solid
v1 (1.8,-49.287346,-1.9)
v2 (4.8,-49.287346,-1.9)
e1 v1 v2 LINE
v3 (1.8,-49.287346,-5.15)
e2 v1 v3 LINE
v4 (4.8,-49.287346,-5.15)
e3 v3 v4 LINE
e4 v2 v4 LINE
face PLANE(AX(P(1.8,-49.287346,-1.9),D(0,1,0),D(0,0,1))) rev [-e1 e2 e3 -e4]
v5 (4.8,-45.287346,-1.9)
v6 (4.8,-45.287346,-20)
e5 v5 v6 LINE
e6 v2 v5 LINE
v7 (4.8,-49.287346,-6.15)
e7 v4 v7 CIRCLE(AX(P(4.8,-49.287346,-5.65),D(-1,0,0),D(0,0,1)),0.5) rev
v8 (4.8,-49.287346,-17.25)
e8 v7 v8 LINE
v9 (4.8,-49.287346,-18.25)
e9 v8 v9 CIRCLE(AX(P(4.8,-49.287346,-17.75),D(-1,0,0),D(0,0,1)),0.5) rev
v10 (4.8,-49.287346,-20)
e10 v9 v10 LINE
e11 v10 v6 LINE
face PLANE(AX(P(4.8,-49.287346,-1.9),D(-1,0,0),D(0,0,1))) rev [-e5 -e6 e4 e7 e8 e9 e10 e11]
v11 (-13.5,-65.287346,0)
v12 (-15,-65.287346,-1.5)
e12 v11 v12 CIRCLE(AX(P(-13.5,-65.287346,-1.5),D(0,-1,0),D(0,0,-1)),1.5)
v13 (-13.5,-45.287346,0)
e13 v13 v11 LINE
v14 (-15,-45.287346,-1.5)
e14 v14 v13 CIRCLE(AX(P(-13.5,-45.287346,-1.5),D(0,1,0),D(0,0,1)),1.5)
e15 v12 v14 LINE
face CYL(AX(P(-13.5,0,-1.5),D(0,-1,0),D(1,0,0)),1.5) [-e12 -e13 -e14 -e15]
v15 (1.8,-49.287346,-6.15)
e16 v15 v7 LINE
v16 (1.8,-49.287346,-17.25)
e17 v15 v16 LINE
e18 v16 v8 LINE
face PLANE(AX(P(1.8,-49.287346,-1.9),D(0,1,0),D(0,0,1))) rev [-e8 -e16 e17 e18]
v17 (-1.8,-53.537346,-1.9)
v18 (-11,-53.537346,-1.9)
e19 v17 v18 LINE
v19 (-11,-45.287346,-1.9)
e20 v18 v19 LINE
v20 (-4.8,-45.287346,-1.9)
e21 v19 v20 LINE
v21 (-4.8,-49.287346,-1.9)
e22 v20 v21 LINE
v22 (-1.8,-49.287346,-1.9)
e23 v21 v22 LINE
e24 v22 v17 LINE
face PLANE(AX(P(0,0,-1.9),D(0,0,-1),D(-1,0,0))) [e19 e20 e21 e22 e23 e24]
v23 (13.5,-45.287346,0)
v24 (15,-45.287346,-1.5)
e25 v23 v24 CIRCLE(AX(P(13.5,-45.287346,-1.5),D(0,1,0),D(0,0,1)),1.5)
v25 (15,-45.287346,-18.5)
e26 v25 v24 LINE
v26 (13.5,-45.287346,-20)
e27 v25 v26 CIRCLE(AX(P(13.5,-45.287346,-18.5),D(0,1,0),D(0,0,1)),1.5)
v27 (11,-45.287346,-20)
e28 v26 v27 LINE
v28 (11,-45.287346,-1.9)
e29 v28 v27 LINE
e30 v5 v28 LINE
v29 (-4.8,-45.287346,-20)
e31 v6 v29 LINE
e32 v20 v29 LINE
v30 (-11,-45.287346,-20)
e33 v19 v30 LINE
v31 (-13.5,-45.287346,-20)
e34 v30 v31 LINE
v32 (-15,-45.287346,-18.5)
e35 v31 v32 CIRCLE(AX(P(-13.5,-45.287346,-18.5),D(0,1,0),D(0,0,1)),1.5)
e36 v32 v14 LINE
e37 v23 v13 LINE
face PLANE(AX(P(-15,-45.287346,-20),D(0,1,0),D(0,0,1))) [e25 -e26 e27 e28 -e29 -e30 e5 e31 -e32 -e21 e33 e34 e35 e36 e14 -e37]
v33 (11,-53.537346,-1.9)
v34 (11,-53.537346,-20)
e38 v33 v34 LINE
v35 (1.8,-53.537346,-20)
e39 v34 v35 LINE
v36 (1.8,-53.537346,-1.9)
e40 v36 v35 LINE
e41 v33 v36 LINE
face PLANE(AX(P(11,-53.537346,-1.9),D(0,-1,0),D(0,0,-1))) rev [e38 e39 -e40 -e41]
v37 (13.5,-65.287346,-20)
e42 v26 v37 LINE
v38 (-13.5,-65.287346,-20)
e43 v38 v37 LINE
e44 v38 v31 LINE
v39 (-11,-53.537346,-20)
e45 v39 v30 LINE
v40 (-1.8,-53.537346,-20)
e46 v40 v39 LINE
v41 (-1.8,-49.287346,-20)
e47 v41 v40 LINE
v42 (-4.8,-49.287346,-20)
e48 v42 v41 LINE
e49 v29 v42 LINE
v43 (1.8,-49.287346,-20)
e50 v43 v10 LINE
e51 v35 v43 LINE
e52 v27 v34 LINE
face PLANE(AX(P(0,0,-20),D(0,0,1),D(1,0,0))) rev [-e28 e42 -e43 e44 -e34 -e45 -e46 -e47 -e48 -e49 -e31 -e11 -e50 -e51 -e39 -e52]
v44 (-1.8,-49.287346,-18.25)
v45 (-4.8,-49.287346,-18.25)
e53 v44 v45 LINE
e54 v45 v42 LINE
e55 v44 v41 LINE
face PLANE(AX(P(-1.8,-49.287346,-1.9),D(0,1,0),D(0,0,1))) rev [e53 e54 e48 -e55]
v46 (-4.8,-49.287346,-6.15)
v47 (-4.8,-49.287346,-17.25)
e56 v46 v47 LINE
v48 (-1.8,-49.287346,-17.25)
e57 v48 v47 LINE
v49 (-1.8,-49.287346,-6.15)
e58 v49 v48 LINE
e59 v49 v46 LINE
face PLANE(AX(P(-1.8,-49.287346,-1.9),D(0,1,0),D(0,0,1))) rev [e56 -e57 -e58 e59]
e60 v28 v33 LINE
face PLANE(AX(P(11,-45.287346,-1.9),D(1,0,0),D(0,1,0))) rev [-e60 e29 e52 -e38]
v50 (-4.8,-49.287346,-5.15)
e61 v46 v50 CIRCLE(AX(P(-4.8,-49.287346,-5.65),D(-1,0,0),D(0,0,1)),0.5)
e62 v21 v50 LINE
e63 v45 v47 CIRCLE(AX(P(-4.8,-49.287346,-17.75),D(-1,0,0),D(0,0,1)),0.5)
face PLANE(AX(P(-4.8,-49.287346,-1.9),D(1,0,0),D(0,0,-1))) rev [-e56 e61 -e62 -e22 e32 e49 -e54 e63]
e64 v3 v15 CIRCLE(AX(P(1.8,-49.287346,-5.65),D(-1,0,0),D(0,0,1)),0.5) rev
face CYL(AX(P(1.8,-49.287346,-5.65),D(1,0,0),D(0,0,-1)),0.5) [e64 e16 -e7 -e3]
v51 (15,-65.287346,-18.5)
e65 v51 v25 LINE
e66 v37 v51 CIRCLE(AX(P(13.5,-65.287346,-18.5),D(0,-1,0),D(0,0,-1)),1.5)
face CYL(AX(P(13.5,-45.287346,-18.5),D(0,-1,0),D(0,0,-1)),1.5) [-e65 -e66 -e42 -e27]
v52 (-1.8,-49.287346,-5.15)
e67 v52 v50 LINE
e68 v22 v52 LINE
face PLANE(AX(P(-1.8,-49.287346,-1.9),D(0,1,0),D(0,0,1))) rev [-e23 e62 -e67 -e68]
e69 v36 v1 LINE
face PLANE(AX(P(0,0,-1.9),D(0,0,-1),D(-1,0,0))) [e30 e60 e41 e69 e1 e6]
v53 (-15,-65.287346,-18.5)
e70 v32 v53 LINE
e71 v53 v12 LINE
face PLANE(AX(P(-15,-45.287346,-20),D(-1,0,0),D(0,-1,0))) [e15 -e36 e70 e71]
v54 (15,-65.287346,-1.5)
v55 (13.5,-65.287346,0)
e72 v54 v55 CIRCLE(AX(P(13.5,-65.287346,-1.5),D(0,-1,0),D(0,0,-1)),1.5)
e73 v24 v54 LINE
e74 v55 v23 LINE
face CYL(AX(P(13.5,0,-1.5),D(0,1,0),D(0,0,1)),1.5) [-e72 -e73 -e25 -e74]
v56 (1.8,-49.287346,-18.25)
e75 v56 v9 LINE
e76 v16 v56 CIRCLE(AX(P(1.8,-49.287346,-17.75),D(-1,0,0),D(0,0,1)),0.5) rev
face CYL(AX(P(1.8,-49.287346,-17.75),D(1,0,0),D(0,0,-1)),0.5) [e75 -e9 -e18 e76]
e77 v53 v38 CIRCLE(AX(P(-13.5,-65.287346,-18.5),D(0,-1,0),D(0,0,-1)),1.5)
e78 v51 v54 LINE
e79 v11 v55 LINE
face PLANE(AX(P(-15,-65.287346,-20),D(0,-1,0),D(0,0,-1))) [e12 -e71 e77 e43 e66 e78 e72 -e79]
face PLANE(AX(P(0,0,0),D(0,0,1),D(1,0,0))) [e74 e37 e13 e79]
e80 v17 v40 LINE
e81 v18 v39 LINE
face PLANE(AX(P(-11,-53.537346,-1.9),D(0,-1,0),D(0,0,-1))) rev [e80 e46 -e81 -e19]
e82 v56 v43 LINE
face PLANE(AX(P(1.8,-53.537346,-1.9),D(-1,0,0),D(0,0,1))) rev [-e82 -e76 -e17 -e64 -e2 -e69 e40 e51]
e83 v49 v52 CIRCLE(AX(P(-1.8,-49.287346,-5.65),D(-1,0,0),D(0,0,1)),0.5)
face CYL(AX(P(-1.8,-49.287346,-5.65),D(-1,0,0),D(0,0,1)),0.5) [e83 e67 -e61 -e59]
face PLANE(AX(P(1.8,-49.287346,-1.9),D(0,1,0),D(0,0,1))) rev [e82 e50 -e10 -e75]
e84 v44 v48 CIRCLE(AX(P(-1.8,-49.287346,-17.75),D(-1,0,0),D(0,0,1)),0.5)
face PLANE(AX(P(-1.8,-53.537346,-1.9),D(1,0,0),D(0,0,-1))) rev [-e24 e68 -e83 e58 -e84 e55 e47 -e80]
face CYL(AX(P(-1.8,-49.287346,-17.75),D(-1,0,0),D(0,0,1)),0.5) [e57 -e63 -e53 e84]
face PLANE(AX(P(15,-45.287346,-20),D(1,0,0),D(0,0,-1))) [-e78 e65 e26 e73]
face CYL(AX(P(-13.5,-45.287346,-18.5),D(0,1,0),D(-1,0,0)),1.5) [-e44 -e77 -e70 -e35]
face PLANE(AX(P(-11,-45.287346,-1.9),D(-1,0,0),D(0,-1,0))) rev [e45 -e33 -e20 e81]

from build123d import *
from OCP.BRepFilletAPI import BRepFilletAPI_MakeChamfer

# Parameters (mm, degrees)
BOSS_EXTRUDE1_DEPTH           = 10
BOSS_EXTRUDE1_DEPTH_BACK      = 20
SKETCH12_R                    = 15
CUT_EXTRUDE9_DEPTH            = 8
CHAMFER1_SIZE                 = 1.5
CHAMFER1_SIZE2                = 0.46241
FILLET11_R                    = 0.78
CHAMFER2_SIZE2                = 5
CHAMFER2_SIZE                 = 8
CUT_EXTRUDE10_START           = -3
SKETCH18_W                    = 25.5
SKETCH18_H                    = 24.1
CUT_EXTRUDE10_DEPTH           = 4.1
SKETCH19_W                    = 8.6
SKETCH19_H                    = 8.6
CUT_EXTRUDE13_DEPTH           = 3.7
CUT_EXTRUDE14_DEPTH           = 2
SKETCH21_R                    = 3.8
CUT_EXTRUDE15_DEPTH           = 116.348128402
SKETCH10_R                    = 12.5
CUT_EXTRUDE8_DEPTH            = 3
SKETCH22_R                    = 0.95
BOSS_EXTRUDE5_DEPTH           = 1.1
BOSS_EXTRUDE5_DRAFT           = 30
BOSS_EXTRUDE5_PROFILE_2_DEPTH = 1.1
BOSS_EXTRUDE5_PROFILE_2_DRAFT = 30
BOSS_EXTRUDE5_PROFILE_3_DEPTH = 1.1
BOSS_EXTRUDE5_PROFILE_3_DRAFT = 30
BOSS_EXTRUDE5_PROFILE_4_DEPTH = 1.1
BOSS_EXTRUDE5_PROFILE_4_DRAFT = 30
CUT_EXTRUDE16_DEPTH           = 8.5
FILLET13_R                    = 2
BOSS_EXTRUDE6_DEPTH           = 3
LPATTERN1_COUNT               = 2
LPATTERN1_PITCH               = 150
LPATTERN1_COPY_1_SKETCH_R     = 0.95
LPATTERN1_COPY_1_DEPTH        = 1.1
LPATTERN1_COPY_1_DRAFT        = 30
LPATTERN1_COPY_2_SKETCH_R     = 0.95
LPATTERN1_COPY_2_DEPTH        = 1.1
LPATTERN1_COPY_2_DRAFT        = 30
LPATTERN1_COPY_3_SKETCH_R     = 0.95
LPATTERN1_COPY_3_DEPTH        = 1.1
LPATTERN1_COPY_3_DRAFT        = 30
LPATTERN1_COPY_4_SKETCH_R     = 0.95
LPATTERN1_COPY_4_DEPTH        = 1.1
LPATTERN1_COPY_4_DRAFT        = 30
LPATTERN1_COPY_5_SKETCH_R     = 0.95
LPATTERN1_COPY_5_DEPTH        = 1.1
LPATTERN1_COPY_5_DRAFT        = 30
LPATTERN1_COPY_6_SKETCH_R     = 0.95
LPATTERN1_COPY_6_DEPTH        = 1.1
LPATTERN1_COPY_6_DRAFT        = 30
LPATTERN1_COPY_7_SKETCH_R     = 0.95
LPATTERN1_COPY_7_DEPTH        = 1.1
LPATTERN1_COPY_7_DRAFT        = 30
FILLET13_OF_LPATTERN1_R       = 2
FILLET12_R                    = 100
FILLET14_R                    = 1
SKETCH32_R                    = 4.55
SKETCH32_R_2                  = 4.5
CUT_EXTRUDE17_DEPTH           = 3
SKETCH33_R                    = 2.75
CUT_EXTRUDE18_DEPTH           = 114.802213105
CUT_EXTRUDE19_DEPTH           = 5
SKETCH56_W                    = 30
SKETCH56_H                    = 20
BOSS_EXTRUDE10_DEPTH          = 20
CUT_EXTRUDE21_DEPTH           = 18.1
FILLET15_R                    = 1.5


# Read off the part's stored shape, not the designer's step: Split3
# Some blends are built 0.0001 mm under size
with BuildPart() as part:
    # Sketch1 → Boss-Extrude1 (new, two sides: drawn at the far end of the back side and taken through both)
    with BuildSketch(Plane.XY.offset(-BOSS_EXTRUDE1_DEPTH_BACK)):
        with BuildLine():
            Line((-100, -15), (0, -51.866662613))
            Line((0, -51.866662613), (100, -15))
            Line((100, -15), (100, 15))
            Line((100, 15), (60, 15))
            add(Edge.make_bspline(
                [(-60, 15), (-39.699350007, 14.814430853), (0, 45.185569147), (39.699350007, 14.814430853), (60, 15)],
                knots=[0, 0, 0, 0, 0.5, 1, 1, 1, 1], degree=3))
            Line((-60, 15), (-100, 15))
            Line((-100, 15), (-100, -15))
        make_face()
        with BuildLine():
            Line((3.188323159, 2.335673435), (2.875864874, 2.765735369))
            Line((2.875864874, 2.765735369), (4.089390366, 3.647413248))
            Line((4.089390366, 3.647413248), (4.40184865, 3.217351313))
            ThreePointArc((4.40184865, 3.217351313), (5.258610463, 4.17939586), (5.908815238, 5.29151288))
            Line((5.908815238, 5.29151288), (5.403247113, 5.455781921))
            Line((5.403247113, 5.455781921), (5.866772605, 6.882366696))
            Line((5.866772605, 6.882366696), (6.37234073, 6.718097654))
            ThreePointArc((6.37234073, 6.718097654), (6.5, 8), (6.37234073, 9.281902346))
            Line((6.37234073, 9.281902346), (5.866772605, 9.117633304))
            Line((5.866772605, 9.117633304), (5.403247113, 10.544218079))
            Line((5.403247113, 10.544218079), (5.908815238, 10.70848712))
            ThreePointArc((5.908815238, 10.70848712), (5.258610463, 11.82060414), (4.40184865, 12.782648687))
            Line((4.40184865, 12.782648687), (4.089390366, 12.352586752))
            Line((4.089390366, 12.352586752), (2.875864874, 13.234264631))
            Line((2.875864874, 13.234264631), (3.188323159, 13.664326565))
            ThreePointArc((3.188323159, 13.664326565), (2.008610463, 14.181867356), (0.75, 14.456585785))
            Line((0.75, 14.456585785), (0.75, 13.925))
            Line((0.75, 13.925), (-0.75, 13.925))
            Line((-0.75, 13.925), (-0.75, 14.456585785))
            ThreePointArc((-0.75, 14.456585785), (-2.008610463, 14.181867356), (-3.188323159, 13.664326565))
            Line((-3.188323159, 13.664326565), (-2.875864874, 13.234264631))
            Line((-2.875864874, 13.234264631), (-4.089390366, 12.352586752))
            Line((-4.089390366, 12.352586752), (-4.40184865, 12.782648687))
            ThreePointArc((-4.40184865, 12.782648687), (-5.258610463, 11.82060414), (-5.908815238, 10.70848712))
            Line((-5.908815238, 10.70848712), (-5.403247113, 10.544218079))
            Line((-5.403247113, 10.544218079), (-5.866772605, 9.117633304))
            Line((-5.866772605, 9.117633304), (-6.37234073, 9.281902346))
            ThreePointArc((-6.37234073, 9.281902346), (-6.5, 8), (-6.37234073, 6.718097654))
            Line((-6.37234073, 6.718097654), (-5.866772605, 6.882366696))
            Line((-5.866772605, 6.882366696), (-5.403247113, 5.455781921))
            Line((-5.403247113, 5.455781921), (-5.908815238, 5.29151288))
            ThreePointArc((-5.908815238, 5.29151288), (-5.258610463, 4.17939586), (-4.40184865, 3.217351313))
            Line((-4.40184865, 3.217351313), (-4.089390366, 3.647413248))
            Line((-4.089390366, 3.647413248), (-2.875864874, 2.765735369))
            Line((-2.875864874, 2.765735369), (-3.188323159, 2.335673435))
            ThreePointArc((-3.188323159, 2.335673435), (-2.008610463, 1.818132644), (-0.75, 1.543414215))
            Line((-0.75, 1.543414215), (-0.75, 2.075))
            Line((-0.75, 2.075), (0.75, 2.075))
            Line((0.75, 2.075), (0.75, 1.543414215))
            ThreePointArc((0.75, 1.543414215), (2.008610463, 1.818132644), (3.188323159, 2.335673435))
        make_face(mode=Mode.SUBTRACT)
    extrude(amount=BOSS_EXTRUDE1_DEPTH + BOSS_EXTRUDE1_DEPTH_BACK)

    # Sketch12 → Cut-Extrude9 (cut)
    with BuildSketch(Plane(origin=(0, 0, -20), x_dir=(-1, 0, 0), z_dir=(0, 0, -1))):
        with Locations((0, 8)):
            Circle(SKETCH12_R)
    extrude(amount=-CUT_EXTRUDE9_DEPTH, mode=Mode.SUBTRACT)

    # Chamfer1: one chamfer whose edges measure the first distance from different faces: ONE call of the kernel's chamfer builder (chamfer() names one face for all edges)
    chamfer1_edges_1 = [part.edges().sort_by_distance(p)[0] for p in [
        (0, 2.075, -12),
    ]]
    chamfer1_side_1 = [part.faces().sort_by_distance(p)[0] for p in [
        (0, 2.075, -1),
    ]]
    chamfer1_edges_2 = [part.edges().sort_by_distance(p)[0] for p in [
        (3.48262762, 3.206574308, -12),
    ]]
    chamfer1_side_2 = [part.faces().sort_by_distance(p)[0] for p in [
        (3.48262762, 3.206574308, -1),
    ]]
    chamfer1_edges_3 = [part.edges().sort_by_distance(p)[0] for p in [
        (5.635009859, 6.169074308, -12),
    ]]
    chamfer1_side_3 = [part.faces().sort_by_distance(p)[0] for p in [
        (5.635009859, 6.169074308, -1),
    ]]
    chamfer1_edges_4 = [part.edges().sort_by_distance(p)[0] for p in [
        (5.635009859, 9.830925692, -12),
    ]]
    chamfer1_side_4 = [part.faces().sort_by_distance(p)[0] for p in [
        (5.635009859, 9.830925692, -1),
    ]]
    chamfer1_edges_5 = [part.edges().sort_by_distance(p)[0] for p in [
        (3.48262762, 12.793425692, -12),
    ]]
    chamfer1_side_5 = [part.faces().sort_by_distance(p)[0] for p in [
        (3.48262762, 12.793425692, -1),
    ]]
    chamfer1_edges_6 = [part.edges().sort_by_distance(p)[0] for p in [
        (0, 13.925, -12),
    ]]
    chamfer1_side_6 = [part.faces().sort_by_distance(p)[0] for p in [
        (0, 13.925, -1),
    ]]
    chamfer1_edges_7 = [part.edges().sort_by_distance(p)[0] for p in [
        (-3.48262762, 12.793425692, -12),
    ]]
    chamfer1_side_7 = [part.faces().sort_by_distance(p)[0] for p in [
        (-3.48262762, 12.793425692, -1),
    ]]
    chamfer1_edges_8 = [part.edges().sort_by_distance(p)[0] for p in [
        (-5.635009859, 9.830925692, -12),
    ]]
    chamfer1_side_8 = [part.faces().sort_by_distance(p)[0] for p in [
        (-5.635009859, 9.830925692, -1),
    ]]
    chamfer1_edges_9 = [part.edges().sort_by_distance(p)[0] for p in [
        (-5.635009859, 6.169074308, -12),
    ]]
    chamfer1_side_9 = [part.faces().sort_by_distance(p)[0] for p in [
        (-5.635009859, 6.169074308, -1),
    ]]
    chamfer1_edges_10 = [part.edges().sort_by_distance(p)[0] for p in [
        (-3.48262762, 3.206574308, -12),
    ]]
    chamfer1_side_10 = [part.faces().sort_by_distance(p)[0] for p in [
        (-3.48262762, 3.206574308, -1),
    ]]
    chamfer1 = BRepFilletAPI_MakeChamfer(part.part.solid().wrapped)
    for e in chamfer1_edges_1:
        chamfer1.Add(CHAMFER1_SIZE, CHAMFER1_SIZE2, e.wrapped, chamfer1_side_1[0].wrapped)  # the first distance lies on this face
    for e in chamfer1_edges_2:
        chamfer1.Add(CHAMFER1_SIZE, CHAMFER1_SIZE2, e.wrapped, chamfer1_side_2[0].wrapped)  # the first distance lies on this face
    for e in chamfer1_edges_3:
        chamfer1.Add(CHAMFER1_SIZE, CHAMFER1_SIZE2, e.wrapped, chamfer1_side_3[0].wrapped)  # the first distance lies on this face
    for e in chamfer1_edges_4:
        chamfer1.Add(CHAMFER1_SIZE, CHAMFER1_SIZE2, e.wrapped, chamfer1_side_4[0].wrapped)  # the first distance lies on this face
    for e in chamfer1_edges_5:
        chamfer1.Add(CHAMFER1_SIZE, CHAMFER1_SIZE2, e.wrapped, chamfer1_side_5[0].wrapped)  # the first distance lies on this face
    for e in chamfer1_edges_6:
        chamfer1.Add(CHAMFER1_SIZE, CHAMFER1_SIZE2, e.wrapped, chamfer1_side_6[0].wrapped)  # the first distance lies on this face
    for e in chamfer1_edges_7:
        chamfer1.Add(CHAMFER1_SIZE, CHAMFER1_SIZE2, e.wrapped, chamfer1_side_7[0].wrapped)  # the first distance lies on this face
    for e in chamfer1_edges_8:
        chamfer1.Add(CHAMFER1_SIZE, CHAMFER1_SIZE2, e.wrapped, chamfer1_side_8[0].wrapped)  # the first distance lies on this face
    for e in chamfer1_edges_9:
        chamfer1.Add(CHAMFER1_SIZE, CHAMFER1_SIZE2, e.wrapped, chamfer1_side_9[0].wrapped)  # the first distance lies on this face
    for e in chamfer1_edges_10:
        chamfer1.Add(CHAMFER1_SIZE, CHAMFER1_SIZE2, e.wrapped, chamfer1_side_10[0].wrapped)  # the first distance lies on this face
    add(Compound.cast(chamfer1.Shape()), mode=Mode.REPLACE)

    # Fillet11
    # the kernel refuses this fillet: 0.78 mm, written as the material it takes off along each edge
    with BuildSketch(Plane(origin=(-4.089390366, 12.352586752, -12.348462837), x_dir=(-0.5877852522924715, 0.8090169943749486, 0), z_dir=(0, 0, 1)), Plane(origin=(-5.866772605, 9.117633304, -12.348462837), x_dir=(-0.9510565162951549, 0.3090169943749433, 0), z_dir=(0, 0, 1)), Plane(origin=(-0.75, 13.925, -12.348462837), x_dir=(0, 1, 0), z_dir=(0, 0, 1)), Plane(origin=(2.875864874, 13.234264631, -12.348462837), x_dir=(0.5877852522924727, 0.8090169943749479, 0), z_dir=(0, 0, 1)), Plane(origin=(5.403247113, 10.544218079, -12.348462837), x_dir=(0.9510565162951538, 0.30901699437494734, 0), z_dir=(0, 0, 1)), Plane(origin=(5.866772605, 6.882366696, -12.348462837), x_dir=(0.9510565162951544, -0.30901699437494534, 0), z_dir=(0, 0, 1)), Plane(origin=(-5.403247113, 5.455781921, -12.348462837), x_dir=(-0.9510565162951544, -0.30901699437494484, 0), z_dir=(0, 0, 1)), Plane(origin=(-2.875864874, 2.765735369, -12.348462837), x_dir=(-0.5877852522924728, -0.8090169943749477, 0), z_dir=(0, 0, 1)), Plane(origin=(0.75, 2.075, -12.348462837), x_dir=(0, -1, 0), z_dir=(0, 0, 1)), Plane(origin=(4.089390366, 3.647413248, -12.348462837), x_dir=(0.5877852522924725, -0.8090169943749479, 0), z_dir=(0, 0, 1))) as fillet11_piece_1:
        with BuildLine():
            CenterArc((0.78, -0.739385135), FILLET11_R, 108.571012268, 71.428987732)
            Line((0, -0.739385135), (-0.0156, -0.739385135))
            Line((-0.0156, -0.739385135), (-0.0156, 0))
            Line((-0.0156, 0), (0, 0.0156))
            ThreePointArc((0, 0.0156), (0.265792893, 0.0156), (0.526617501, 0.014787703))
            Line((0.526617501, 0.014787703), (0.531585785, 0))
        make_face()
    extrude(amount=24.196925675, mode=Mode.SUBTRACT)
    with BuildSketch(Plane(origin=(-5.403247113, 10.544218079, -12.348462837), x_dir=(-0.3090169943749473, -0.9510565162951535, 0), z_dir=(0, 0, 1)), Plane(origin=(-2.875864874, 13.234264631, -12.348462837), x_dir=(-0.809016994374947, -0.5877852522924738, 0), z_dir=(0, 0, 1)), Plane(origin=(0.75, 13.925, -12.348462837), x_dir=(-1, 0, 0), z_dir=(0, 0, 1)), Plane(origin=(4.089390366, 12.352586752, -12.348462837), x_dir=(-0.8090169943749471, 0.5877852522924735, 0), z_dir=(0, 0, 1)), Plane(origin=(5.866772605, 9.117633304, -12.348462837), x_dir=(-0.30901699437494623, 0.951056516295154, 0), z_dir=(0, 0, 1)), Plane(origin=(5.403247113, 5.455781921, -12.348462837), x_dir=(0.30901699437494773, 0.9510565162951536, 0), z_dir=(0, 0, 1)), Plane(origin=(-5.866772605, 6.882366696, -12.348462837), x_dir=(0.3090169943749473, -0.9510565162951536, 0), z_dir=(0, 0, 1)), Plane(origin=(-4.089390366, 3.647413248, -12.348462837), x_dir=(0.809016994374947, -0.5877852522924737, 0), z_dir=(0, 0, 1)), Plane(origin=(-0.75, 2.075, -12.348462837), x_dir=(1, 0, 0), z_dir=(0, 0, 1)), Plane(origin=(2.875864874, 2.765735369, -12.348462837), x_dir=(0.8090169943749471, 0.5877852522924735, 0), z_dir=(0, 0, 1))) as fillet11_piece_2:
        with BuildLine():
            CenterArc((0.739385135, -0.78), FILLET11_R, 90, 71.428987732)
            Line((0, -0.531585785), (-0.014787703, -0.526617501))
            ThreePointArc((-0.014787703, -0.526617501), (-0.0156, -0.265792893), (-0.0156, 0))
            Line((-0.0156, 0), (0, 0.0156))
            Line((0, 0.0156), (0.739385135, 0.0156))
            Line((0.739385135, 0.0156), (0.739385135, 0))
        make_face()
    extrude(amount=24.196925675, mode=Mode.SUBTRACT)

    # Chamfer2
    chamfer2_edges = [part.edges().sort_by_distance(p)[0] for p in [
        (15, 8, -20),
    ]]
    chamfer2_side = [part.faces().sort_by_distance(p)[0] for p in [
        (15, 8, -19.9),
    ]]
    chamfer(chamfer2_edges, length=CHAMFER2_SIZE - 0.0001, length2=CHAMFER2_SIZE2 - 0.0001, reference=chamfer2_side[0])  # a hair under: the kernel refuses the full size

    # Sketch18 → Cut-Extrude10 (cut)
    with BuildSketch(Plane.XY.offset(CUT_EXTRUDE10_START)):
        with Locations((-75, 0.285)):
            Rectangle(SKETCH18_W, SKETCH18_H)
    cut_extrude10 = extrude(amount=CUT_EXTRUDE10_DEPTH, mode=Mode.SUBTRACT)

    # Sketch19 → Cut-Extrude13 (cut)
    with BuildSketch(Plane(origin=(0, 0, 1.1), x_dir=(-1, 0, 0), z_dir=(0, 0, -1))):
        with Locations((75, -2.265)):
            Rectangle(SKETCH19_W, SKETCH19_H)
    cut_extrude13 = extrude(amount=-CUT_EXTRUDE13_DEPTH, mode=Mode.SUBTRACT)

    # Sketch20 → Cut-Extrude14 (cut)
    with BuildSketch(Plane(origin=(0, 0, 1.1), x_dir=(-1, 0, 0), z_dir=(0, 0, -1))):
        Polygon((79.3, 2.035), (79.3, 5.335), (81.5, 5.335), (81.5, 9.835), (70.7, 9.835), (70.7, 2.035), align=None)
    cut_extrude14 = extrude(amount=-CUT_EXTRUDE14_DEPTH, mode=Mode.SUBTRACT)

    # Sketch21 → Cut-Extrude15 (cut, through all)
    with BuildSketch(Plane(origin=(0, 0, 4.8), x_dir=(-1, 0, 0), z_dir=(0, 0, -1))):
        with Locations((75, -2.265)):
            Circle(SKETCH21_R)
    cut_extrude15 = extrude(amount=-CUT_EXTRUDE15_DEPTH, mode=Mode.SUBTRACT)

    # Sketch10 → Cut-Extrude8 (cut)
    with BuildSketch(Plane.XY.offset(10)):
        with Locations((-75, -2.265)):
            Circle(SKETCH10_R)
    cut_extrude8 = extrude(amount=-CUT_EXTRUDE8_DEPTH, mode=Mode.SUBTRACT)


with BuildPart() as boss_extrude5_tool:
    # Sketch22 → Boss-Extrude5 (with draft: the straight prism first)
    with BuildSketch(Plane(origin=(0, 0, 1.1), x_dir=(-1, 0, 0), z_dir=(0, 0, -1))):
        with Locations((64.35, 10.235)):
            Circle(SKETCH22_R)
    extrude(amount=BOSS_EXTRUDE5_DEPTH)
    # Boss-Extrude5: the draft: its side faces are tilted about the plane it starts from
    boss_extrude5_sides = [boss_extrude5_tool.faces().sort_by_distance(p)[0] for p in [
        (-63.4, 10.235, 0.55),
    ]]
    draft(boss_extrude5_sides, Plane(origin=(0, 0, 1.1), x_dir=(-1, 0, 0), z_dir=(0, 0, -1)), BOSS_EXTRUDE5_DRAFT)


with BuildPart() as part_1:
    add(part.part)

    # Boss-Extrude5: add boss_extrude5_tool
    add(boss_extrude5_tool.part)


with BuildPart() as boss_extrude5_profile_2_tool:
    # Sketch22 → Boss-Extrude5 profile 2 (with draft: the straight prism first)
    with BuildSketch(Plane(origin=(0, 0, 1.1), x_dir=(-1, 0, 0), z_dir=(0, 0, -1))):
        with Locations((85.65, 10.235)):
            Circle(SKETCH22_R)
    extrude(amount=BOSS_EXTRUDE5_PROFILE_2_DEPTH)
    # Boss-Extrude5 profile 2: the draft: its side faces are tilted about the plane it starts from
    boss_extrude5_profile_2_sides = [boss_extrude5_profile_2_tool.faces().sort_by_distance(p)[0] for p in [
        (-84.7, 10.235, 0.55),
    ]]
    draft(boss_extrude5_profile_2_sides, Plane(origin=(0, 0, 1.1), x_dir=(-1, 0, 0), z_dir=(0, 0, -1)), BOSS_EXTRUDE5_PROFILE_2_DRAFT)


with BuildPart() as part_2:
    add(part_1.part)

    # Boss-Extrude5 profile 2: add boss_extrude5_profile_2_tool
    add(boss_extrude5_profile_2_tool.part)


with BuildPart() as boss_extrude5_profile_3_tool:
    # Sketch22 → Boss-Extrude5 profile 3 (with draft: the straight prism first)
    with BuildSketch(Plane(origin=(0, 0, 1.1), x_dir=(-1, 0, 0), z_dir=(0, 0, -1))):
        with Locations((85.65, -2.105)):
            Circle(SKETCH22_R)
    extrude(amount=BOSS_EXTRUDE5_PROFILE_3_DEPTH)
    # Boss-Extrude5 profile 3: the draft: its side faces are tilted about the plane it starts from
    boss_extrude5_profile_3_sides = [boss_extrude5_profile_3_tool.faces().sort_by_distance(p)[0] for p in [
        (-84.7, -2.105, 0.55),
    ]]
    draft(boss_extrude5_profile_3_sides, Plane(origin=(0, 0, 1.1), x_dir=(-1, 0, 0), z_dir=(0, 0, -1)), BOSS_EXTRUDE5_PROFILE_3_DRAFT)


with BuildPart() as part_3:
    add(part_2.part)

    # Boss-Extrude5 profile 3: add boss_extrude5_profile_3_tool
    add(boss_extrude5_profile_3_tool.part)


with BuildPart() as boss_extrude5_profile_4_tool:
    # Sketch22 → Boss-Extrude5 profile 4 (with draft: the straight prism first)
    with BuildSketch(Plane(origin=(0, 0, 1.1), x_dir=(-1, 0, 0), z_dir=(0, 0, -1))):
        with Locations((64.35, -2.105)):
            Circle(SKETCH22_R)
    extrude(amount=BOSS_EXTRUDE5_PROFILE_4_DEPTH)
    # Boss-Extrude5 profile 4: the draft: its side faces are tilted about the plane it starts from
    boss_extrude5_profile_4_sides = [boss_extrude5_profile_4_tool.faces().sort_by_distance(p)[0] for p in [
        (-63.4, -2.105, 0.55),
    ]]
    draft(boss_extrude5_profile_4_sides, Plane(origin=(0, 0, 1.1), x_dir=(-1, 0, 0), z_dir=(0, 0, -1)), BOSS_EXTRUDE5_PROFILE_4_DRAFT)


with BuildPart() as part_4:
    add(part_3.part)

    # Boss-Extrude5 profile 4: add boss_extrude5_profile_4_tool
    add(boss_extrude5_profile_4_tool.part)

    # Sketch24 → Cut-Extrude16 (cut, symmetric)
    with BuildSketch(Plane(origin=(-75, 0, 0), x_dir=(0, 0, -1), z_dir=(1, 0, 0))):
        Polygon((0.8, -11.765), (0.8, -19.265), (20, -19.265), (20, -18.065), (2, -18.065), (2, -11.765), align=None)
    cut_extrude16 = extrude(amount=CUT_EXTRUDE16_DEPTH, both=True, mode=Mode.SUBTRACT)

    # Fillet13
    fillet13_edges = [part_4.edges().sort_by_distance(p)[0] for p in [
        (-75, -19.265, -0.8),
        (-75, -18.065, -2),
    ]]
    fillet(fillet13_edges, radius=FILLET13_R)

    # Sketch25 → Boss-Extrude6 (add)
    with BuildSketch(Plane.XY.offset(-3)):
        with BuildLine():
            Line((-84.672341587, 10.739166667), (-83.303552478, 10.739166667))
            ThreePointArc((-83.303552478, 10.739166667), (-83.952943725, 8.537943725), (-86.154166667, 7.888552478))
            Line((-86.154166667, 7.888552478), (-86.154166667, 9.257341587))
            ThreePointArc((-86.154166667, 9.257341587), (-84.872182541, 9.457182541), (-84.672341587, 10.739166667))
        make_face()
        with BuildLine():
            Line((-65.327658413, 10.739166667), (-66.696447522, 10.739166667))
            ThreePointArc((-66.696447522, 10.739166667), (-66.047056275, 8.537943725), (-63.845833333, 7.888552478))
            Line((-63.845833333, 7.888552478), (-63.845833333, 9.257341587))
            ThreePointArc((-63.845833333, 9.257341587), (-65.127817459, 9.457182541), (-65.327658413, 10.739166667))
        make_face()
        with BuildLine():
            Line((-85.65, -1.005), (-85.65, 0.295))
            ThreePointArc((-85.65, 0.295), (-83.25, -2.105), (-85.65, -4.505))
            Line((-85.65, -4.505), (-85.65, -3.205))
            ThreePointArc((-85.65, -3.205), (-84.55, -2.105), (-85.65, -1.005))
        make_face()
        with BuildLine():
            Line((-64.35, -3.205), (-64.35, -4.505))
            ThreePointArc((-64.35, -4.505), (-66.75, -2.105), (-64.35, 0.295))
            Line((-64.35, 0.295), (-64.35, -1.005))
            ThreePointArc((-64.35, -1.005), (-65.45, -2.105), (-64.35, -3.205))
        make_face()
    boss_extrude6 = extrude(amount=BOSS_EXTRUDE6_DEPTH)

    # LPattern1: Cut-Extrude10, Cut-Extrude13, Cut-Extrude14, Cut-Extrude15, Cut-Extrude8, Cut-Extrude16, Boss-Extrude6 ×2
    with Locations(*[(i * LPATTERN1_PITCH, 0, 0) for i in range(1, LPATTERN1_COUNT)]):
        add(cut_extrude10, mode=Mode.SUBTRACT)
        add(cut_extrude13, mode=Mode.SUBTRACT)
        add(cut_extrude14, mode=Mode.SUBTRACT)
        add(cut_extrude15, mode=Mode.SUBTRACT)
        add(cut_extrude8, mode=Mode.SUBTRACT)
        add(cut_extrude16, mode=Mode.SUBTRACT)
        add(boss_extrude6)


with BuildPart() as lpattern1_copy_1_tool:
    # LPattern1 copy 1 sketch → LPattern1 copy 1 (with draft: the straight prism first)
    with BuildSketch(Plane(origin=(150, 0, 1.1), x_dir=(-1, 0, 0), z_dir=(0, 0, -1))):
        with Locations((64.35, 10.235)):
            Circle(LPATTERN1_COPY_1_SKETCH_R)
    extrude(amount=LPATTERN1_COPY_1_DEPTH)
    # LPattern1 copy 1: the draft: its side faces are tilted about the plane it starts from
    lpattern1_copy_1_sides = [lpattern1_copy_1_tool.faces().sort_by_distance(p)[0] for p in [
        (86.6, 10.235, 0.55),
    ]]
    draft(lpattern1_copy_1_sides, Plane(origin=(150, 0, 1.1), x_dir=(-1, 0, 0), z_dir=(0, 0, -1)), LPATTERN1_COPY_1_DRAFT)


with BuildPart() as part_5:
    add(part_4.part)

    # LPattern1 copy 1: add lpattern1_copy_1_tool
    add(lpattern1_copy_1_tool.part)


with BuildPart() as lpattern1_copy_2_tool:
    # LPattern1 copy 2 sketch → LPattern1 copy 2 (with draft: the straight prism first)
    with BuildSketch(Plane(origin=(150, 0, 1.1), x_dir=(-1, 0, 0), z_dir=(0, 0, -1))):
        with Locations((85.65, 10.235)):
            Circle(LPATTERN1_COPY_2_SKETCH_R)
    extrude(amount=LPATTERN1_COPY_2_DEPTH)
    # LPattern1 copy 2: the draft: its side faces are tilted about the plane it starts from
    lpattern1_copy_2_sides = [lpattern1_copy_2_tool.faces().sort_by_distance(p)[0] for p in [
        (65.3, 10.235, 0.55),
    ]]
    draft(lpattern1_copy_2_sides, Plane(origin=(150, 0, 1.1), x_dir=(-1, 0, 0), z_dir=(0, 0, -1)), LPATTERN1_COPY_2_DRAFT)


with BuildPart() as part_6:
    add(part_5.part)

    # LPattern1 copy 2: add lpattern1_copy_2_tool
    add(lpattern1_copy_2_tool.part)


with BuildPart() as lpattern1_copy_3_tool:
    # LPattern1 copy 3 sketch → LPattern1 copy 3 (with draft: the straight prism first)
    with BuildSketch(Plane(origin=(150, 0, 1.1), x_dir=(-1, 0, 0), z_dir=(0, 0, -1))):
        with Locations((85.65, -2.105)):
            Circle(LPATTERN1_COPY_3_SKETCH_R)
    extrude(amount=LPATTERN1_COPY_3_DEPTH)
    # LPattern1 copy 3: the draft: its side faces are tilted about the plane it starts from
    lpattern1_copy_3_sides = [lpattern1_copy_3_tool.faces().sort_by_distance(p)[0] for p in [
        (65.3, -2.105, 0.55),
    ]]
    draft(lpattern1_copy_3_sides, Plane(origin=(150, 0, 1.1), x_dir=(-1, 0, 0), z_dir=(0, 0, -1)), LPATTERN1_COPY_3_DRAFT)


with BuildPart() as part_7:
    add(part_6.part)

    # LPattern1 copy 3: add lpattern1_copy_3_tool
    add(lpattern1_copy_3_tool.part)


with BuildPart() as lpattern1_copy_4_tool:
    # LPattern1 copy 4 sketch → LPattern1 copy 4 (with draft: the straight prism first)
    with BuildSketch(Plane(origin=(150, 0, 1.1), x_dir=(-1, 0, 0), z_dir=(0, 0, -1))):
        with Locations((64.35, -2.105)):
            Circle(LPATTERN1_COPY_4_SKETCH_R)
    extrude(amount=LPATTERN1_COPY_4_DEPTH)
    # LPattern1 copy 4: the draft: its side faces are tilted about the plane it starts from
    lpattern1_copy_4_sides = [lpattern1_copy_4_tool.faces().sort_by_distance(p)[0] for p in [
        (86.6, -2.105, 0.55),
    ]]
    draft(lpattern1_copy_4_sides, Plane(origin=(150, 0, 1.1), x_dir=(-1, 0, 0), z_dir=(0, 0, -1)), LPATTERN1_COPY_4_DRAFT)


with BuildPart() as part_8:
    add(part_7.part)

    # LPattern1 copy 4: add lpattern1_copy_4_tool
    add(lpattern1_copy_4_tool.part)


with BuildPart() as lpattern1_copy_5_tool:
    # LPattern1 copy 5 sketch → LPattern1 copy 5 (with draft: the straight prism first)
    with BuildSketch(Plane(origin=(150, 0, 1.1), x_dir=(-1, 0, 0), z_dir=(0, 0, -1))):
        with Locations((85.65, 10.235)):
            Circle(LPATTERN1_COPY_5_SKETCH_R)
    extrude(amount=LPATTERN1_COPY_5_DEPTH)
    # LPattern1 copy 5: the draft: its side faces are tilted about the plane it starts from
    lpattern1_copy_5_sides = [lpattern1_copy_5_tool.faces().sort_by_distance(p)[0] for p in [
        (65.3, 10.235, 0.55),
    ]]
    draft(lpattern1_copy_5_sides, Plane(origin=(150, 0, 1.1), x_dir=(-1, 0, 0), z_dir=(0, 0, -1)), LPATTERN1_COPY_5_DRAFT)


with BuildPart() as part_9:
    add(part_8.part)

    # LPattern1 copy 5: add lpattern1_copy_5_tool
    add(lpattern1_copy_5_tool.part)


with BuildPart() as lpattern1_copy_6_tool:
    # LPattern1 copy 6 sketch → LPattern1 copy 6 (with draft: the straight prism first)
    with BuildSketch(Plane(origin=(150, 0, 1.1), x_dir=(-1, 0, 0), z_dir=(0, 0, -1))):
        with Locations((85.65, -2.105)):
            Circle(LPATTERN1_COPY_6_SKETCH_R)
    extrude(amount=LPATTERN1_COPY_6_DEPTH)
    # LPattern1 copy 6: the draft: its side faces are tilted about the plane it starts from
    lpattern1_copy_6_sides = [lpattern1_copy_6_tool.faces().sort_by_distance(p)[0] for p in [
        (65.3, -2.105, 0.55),
    ]]
    draft(lpattern1_copy_6_sides, Plane(origin=(150, 0, 1.1), x_dir=(-1, 0, 0), z_dir=(0, 0, -1)), LPATTERN1_COPY_6_DRAFT)


with BuildPart() as part_10:
    add(part_9.part)

    # LPattern1 copy 6: add lpattern1_copy_6_tool
    add(lpattern1_copy_6_tool.part)


with BuildPart() as lpattern1_copy_7_tool:
    # LPattern1 copy 7 sketch → LPattern1 copy 7 (with draft: the straight prism first)
    with BuildSketch(Plane(origin=(150, 0, 1.1), x_dir=(-1, 0, 0), z_dir=(0, 0, -1))):
        with Locations((64.35, -2.105)):
            Circle(LPATTERN1_COPY_7_SKETCH_R)
    extrude(amount=LPATTERN1_COPY_7_DEPTH)
    # LPattern1 copy 7: the draft: its side faces are tilted about the plane it starts from
    lpattern1_copy_7_sides = [lpattern1_copy_7_tool.faces().sort_by_distance(p)[0] for p in [
        (86.6, -2.105, 0.55),
    ]]
    draft(lpattern1_copy_7_sides, Plane(origin=(150, 0, 1.1), x_dir=(-1, 0, 0), z_dir=(0, 0, -1)), LPATTERN1_COPY_7_DRAFT)


with BuildPart() as part_11:
    add(part_10.part)

    # LPattern1 copy 7: add lpattern1_copy_7_tool
    add(lpattern1_copy_7_tool.part)

    # Fillet13 of LPattern1
    fillet13_of_lpattern1_edges = [part_11.edges().sort_by_distance(p)[0] for p in [
        (75, -19.265, -0.8),
        (75, -18.065, -2),
    ]]
    fillet(fillet13_of_lpattern1_edges, radius=FILLET13_OF_LPATTERN1_R)

    # Fillet12
    fillet12_edges = [part_11.edges().sort_by_distance(p)[0] for p in [
        (0, -51.866662613, -5),
    ]]
    fillet(fillet12_edges, radius=FILLET12_R)

    # Fillet14
    fillet14_edges = [part_11.edges().sort_by_distance(p)[0] for p in [
        (19.9999, 8, -20),
        (-87.5, -2.265, 10),
        (62.5, -2.265, 10),
    ]]
    fillet(fillet14_edges, radius=FILLET14_R)

    # Sketch32 → Cut-Extrude17 (cut)
    with BuildSketch(Plane.XY.offset(10)):
        with Locations((-93.5, -2.271550921)):
            Circle(SKETCH32_R)
        with Locations((-28.332209431, 14.008347309)):
            Circle(SKETCH32_R_2)
        with Locations((0, -32.79283808)):
            Circle(SKETCH32_R_2)
    cut_extrude17 = extrude(amount=-CUT_EXTRUDE17_DEPTH, mode=Mode.SUBTRACT)

    # Sketch33 → Cut-Extrude18 (cut, through all)
    with BuildSketch(Plane.XY.offset(10)):
        with Locations((-28.332209431, 14.008347309)):
            Circle(SKETCH33_R)
        with Locations((-93.5, -2.271550921)):
            Circle(SKETCH33_R)
        with Locations((0, -32.79283808)):
            Circle(SKETCH33_R)
    cut_extrude18 = extrude(amount=-CUT_EXTRUDE18_DEPTH, mode=Mode.SUBTRACT)

    # Sketch35 → Cut-Extrude19 (cut)
    with BuildSketch(Plane(origin=(0, 0, -20), x_dir=(-1, 0, 0), z_dir=(0, 0, -1))):
        Polygon((4.55, -30.165894355), (0, -27.53895063), (-4.55, -30.165894355), (-4.55, -35.419781805), (0, -38.04672553), (4.55, -35.419781805), align=None)
        Polygon((32.882209431, 16.635291034), (28.332209431, 19.262234759), (23.782209431, 16.635291034), (23.782209431, 11.381403584), (28.332209431, 8.75445986), (32.882209431, 11.381403584), align=None)
        Polygon((98.05, 0.355392804), (93.5, 2.982336529), (88.95, 0.355392804), (88.95, -4.898494646), (93.5, -7.525438371), (98.05, -4.898494646), align=None)
    cut_extrude19 = extrude(amount=-CUT_EXTRUDE19_DEPTH, mode=Mode.SUBTRACT)

    # Mirror1: Cut-Extrude17, Cut-Extrude18, Cut-Extrude19 across plane
    add(cut_extrude17.mirror(Plane(origin=(0, 0, 0), x_dir=(0, 0, 1), z_dir=(1, 0, 0))), mode=Mode.SUBTRACT)
    add(cut_extrude18.mirror(Plane(origin=(0, 0, 0), x_dir=(0, 0, 1), z_dir=(1, 0, 0))), mode=Mode.SUBTRACT)
    add(cut_extrude19.mirror(Plane(origin=(0, 0, 0), x_dir=(0, 0, 1), z_dir=(1, 0, 0))), mode=Mode.SUBTRACT)

    # Split2
    split(bisect_by=Plane.XY, keep=Keep.BOTTOM)


with BuildPart() as body_2:
    # Sketch56 → Boss-Extrude10 (new body)
    with BuildSketch(Plane.XY):
        with Locations((0, -55.287345613)):
            Rectangle(SKETCH56_W, SKETCH56_H)
    extrude(amount=-BOSS_EXTRUDE10_DEPTH)

    # Sketch46 → Cut-Extrude21 (cut)
    with BuildSketch(Plane(origin=(0, 0, -20), x_dir=(-1, 0, 0), z_dir=(0, 0, -1))):
        Polygon((-11, -45.287345613), (-11, -53.537345613), (-1.8, -53.537345613), (-1.8, -49.287345613), (-4.8, -49.287345613), (-4.8, -45.287345613), align=None)
        Polygon((4.8, -49.287345613), (4.8, -45.287345613), (11, -45.287345613), (11, -53.537345613), (1.8, -53.537345613), (1.8, -49.287345613), align=None)
    extrude(amount=-CUT_EXTRUDE21_DEPTH, mode=Mode.SUBTRACT)

    # Sweep10: sweep along a path in Sketch55
    with BuildLine(Plane.XZ.offset(49.287345613)) as sweep10_path:
        Line((-1.8, -17.66984137), (-4.8, -17.66984137))
    # Sketch54 → Sweep10 (sweep)
    with BuildSketch(Plane.ZY.offset(1.8)):
        with BuildLine():
            Line((-5.15, -49.287345613), (-6.15, -49.287345613))
            ThreePointArc((-6.15, -49.287345613), (-5.65, -49.787345613), (-5.15, -49.287345613))
        make_face()
        with BuildLine():
            Line((-18.25, -49.287345613), (-17.25, -49.287345613))
            ThreePointArc((-17.25, -49.287345613), (-17.75, -49.787345613), (-18.25, -49.287345613))
        make_face()
    sweep10 = sweep(path=sweep10_path.line)

    # Mirror2: Sweep10 across plane
    add(sweep10.mirror(Plane(origin=(0, 0, 0), x_dir=(0, 0, 1), z_dir=(1, 0, 0))))

    # Fillet15
    fillet15_edges = [body_2.edges().sort_by_distance(p)[0] for p in [
        (15, -55.287345613, -20),
        (-15, -55.287345613, -20),
        (15, -55.287345613, 0),
        (-15, -55.287345613, 0),
    ]]
    fillet(fillet15_edges, radius=FILLET15_R)


solid = body_2.part
